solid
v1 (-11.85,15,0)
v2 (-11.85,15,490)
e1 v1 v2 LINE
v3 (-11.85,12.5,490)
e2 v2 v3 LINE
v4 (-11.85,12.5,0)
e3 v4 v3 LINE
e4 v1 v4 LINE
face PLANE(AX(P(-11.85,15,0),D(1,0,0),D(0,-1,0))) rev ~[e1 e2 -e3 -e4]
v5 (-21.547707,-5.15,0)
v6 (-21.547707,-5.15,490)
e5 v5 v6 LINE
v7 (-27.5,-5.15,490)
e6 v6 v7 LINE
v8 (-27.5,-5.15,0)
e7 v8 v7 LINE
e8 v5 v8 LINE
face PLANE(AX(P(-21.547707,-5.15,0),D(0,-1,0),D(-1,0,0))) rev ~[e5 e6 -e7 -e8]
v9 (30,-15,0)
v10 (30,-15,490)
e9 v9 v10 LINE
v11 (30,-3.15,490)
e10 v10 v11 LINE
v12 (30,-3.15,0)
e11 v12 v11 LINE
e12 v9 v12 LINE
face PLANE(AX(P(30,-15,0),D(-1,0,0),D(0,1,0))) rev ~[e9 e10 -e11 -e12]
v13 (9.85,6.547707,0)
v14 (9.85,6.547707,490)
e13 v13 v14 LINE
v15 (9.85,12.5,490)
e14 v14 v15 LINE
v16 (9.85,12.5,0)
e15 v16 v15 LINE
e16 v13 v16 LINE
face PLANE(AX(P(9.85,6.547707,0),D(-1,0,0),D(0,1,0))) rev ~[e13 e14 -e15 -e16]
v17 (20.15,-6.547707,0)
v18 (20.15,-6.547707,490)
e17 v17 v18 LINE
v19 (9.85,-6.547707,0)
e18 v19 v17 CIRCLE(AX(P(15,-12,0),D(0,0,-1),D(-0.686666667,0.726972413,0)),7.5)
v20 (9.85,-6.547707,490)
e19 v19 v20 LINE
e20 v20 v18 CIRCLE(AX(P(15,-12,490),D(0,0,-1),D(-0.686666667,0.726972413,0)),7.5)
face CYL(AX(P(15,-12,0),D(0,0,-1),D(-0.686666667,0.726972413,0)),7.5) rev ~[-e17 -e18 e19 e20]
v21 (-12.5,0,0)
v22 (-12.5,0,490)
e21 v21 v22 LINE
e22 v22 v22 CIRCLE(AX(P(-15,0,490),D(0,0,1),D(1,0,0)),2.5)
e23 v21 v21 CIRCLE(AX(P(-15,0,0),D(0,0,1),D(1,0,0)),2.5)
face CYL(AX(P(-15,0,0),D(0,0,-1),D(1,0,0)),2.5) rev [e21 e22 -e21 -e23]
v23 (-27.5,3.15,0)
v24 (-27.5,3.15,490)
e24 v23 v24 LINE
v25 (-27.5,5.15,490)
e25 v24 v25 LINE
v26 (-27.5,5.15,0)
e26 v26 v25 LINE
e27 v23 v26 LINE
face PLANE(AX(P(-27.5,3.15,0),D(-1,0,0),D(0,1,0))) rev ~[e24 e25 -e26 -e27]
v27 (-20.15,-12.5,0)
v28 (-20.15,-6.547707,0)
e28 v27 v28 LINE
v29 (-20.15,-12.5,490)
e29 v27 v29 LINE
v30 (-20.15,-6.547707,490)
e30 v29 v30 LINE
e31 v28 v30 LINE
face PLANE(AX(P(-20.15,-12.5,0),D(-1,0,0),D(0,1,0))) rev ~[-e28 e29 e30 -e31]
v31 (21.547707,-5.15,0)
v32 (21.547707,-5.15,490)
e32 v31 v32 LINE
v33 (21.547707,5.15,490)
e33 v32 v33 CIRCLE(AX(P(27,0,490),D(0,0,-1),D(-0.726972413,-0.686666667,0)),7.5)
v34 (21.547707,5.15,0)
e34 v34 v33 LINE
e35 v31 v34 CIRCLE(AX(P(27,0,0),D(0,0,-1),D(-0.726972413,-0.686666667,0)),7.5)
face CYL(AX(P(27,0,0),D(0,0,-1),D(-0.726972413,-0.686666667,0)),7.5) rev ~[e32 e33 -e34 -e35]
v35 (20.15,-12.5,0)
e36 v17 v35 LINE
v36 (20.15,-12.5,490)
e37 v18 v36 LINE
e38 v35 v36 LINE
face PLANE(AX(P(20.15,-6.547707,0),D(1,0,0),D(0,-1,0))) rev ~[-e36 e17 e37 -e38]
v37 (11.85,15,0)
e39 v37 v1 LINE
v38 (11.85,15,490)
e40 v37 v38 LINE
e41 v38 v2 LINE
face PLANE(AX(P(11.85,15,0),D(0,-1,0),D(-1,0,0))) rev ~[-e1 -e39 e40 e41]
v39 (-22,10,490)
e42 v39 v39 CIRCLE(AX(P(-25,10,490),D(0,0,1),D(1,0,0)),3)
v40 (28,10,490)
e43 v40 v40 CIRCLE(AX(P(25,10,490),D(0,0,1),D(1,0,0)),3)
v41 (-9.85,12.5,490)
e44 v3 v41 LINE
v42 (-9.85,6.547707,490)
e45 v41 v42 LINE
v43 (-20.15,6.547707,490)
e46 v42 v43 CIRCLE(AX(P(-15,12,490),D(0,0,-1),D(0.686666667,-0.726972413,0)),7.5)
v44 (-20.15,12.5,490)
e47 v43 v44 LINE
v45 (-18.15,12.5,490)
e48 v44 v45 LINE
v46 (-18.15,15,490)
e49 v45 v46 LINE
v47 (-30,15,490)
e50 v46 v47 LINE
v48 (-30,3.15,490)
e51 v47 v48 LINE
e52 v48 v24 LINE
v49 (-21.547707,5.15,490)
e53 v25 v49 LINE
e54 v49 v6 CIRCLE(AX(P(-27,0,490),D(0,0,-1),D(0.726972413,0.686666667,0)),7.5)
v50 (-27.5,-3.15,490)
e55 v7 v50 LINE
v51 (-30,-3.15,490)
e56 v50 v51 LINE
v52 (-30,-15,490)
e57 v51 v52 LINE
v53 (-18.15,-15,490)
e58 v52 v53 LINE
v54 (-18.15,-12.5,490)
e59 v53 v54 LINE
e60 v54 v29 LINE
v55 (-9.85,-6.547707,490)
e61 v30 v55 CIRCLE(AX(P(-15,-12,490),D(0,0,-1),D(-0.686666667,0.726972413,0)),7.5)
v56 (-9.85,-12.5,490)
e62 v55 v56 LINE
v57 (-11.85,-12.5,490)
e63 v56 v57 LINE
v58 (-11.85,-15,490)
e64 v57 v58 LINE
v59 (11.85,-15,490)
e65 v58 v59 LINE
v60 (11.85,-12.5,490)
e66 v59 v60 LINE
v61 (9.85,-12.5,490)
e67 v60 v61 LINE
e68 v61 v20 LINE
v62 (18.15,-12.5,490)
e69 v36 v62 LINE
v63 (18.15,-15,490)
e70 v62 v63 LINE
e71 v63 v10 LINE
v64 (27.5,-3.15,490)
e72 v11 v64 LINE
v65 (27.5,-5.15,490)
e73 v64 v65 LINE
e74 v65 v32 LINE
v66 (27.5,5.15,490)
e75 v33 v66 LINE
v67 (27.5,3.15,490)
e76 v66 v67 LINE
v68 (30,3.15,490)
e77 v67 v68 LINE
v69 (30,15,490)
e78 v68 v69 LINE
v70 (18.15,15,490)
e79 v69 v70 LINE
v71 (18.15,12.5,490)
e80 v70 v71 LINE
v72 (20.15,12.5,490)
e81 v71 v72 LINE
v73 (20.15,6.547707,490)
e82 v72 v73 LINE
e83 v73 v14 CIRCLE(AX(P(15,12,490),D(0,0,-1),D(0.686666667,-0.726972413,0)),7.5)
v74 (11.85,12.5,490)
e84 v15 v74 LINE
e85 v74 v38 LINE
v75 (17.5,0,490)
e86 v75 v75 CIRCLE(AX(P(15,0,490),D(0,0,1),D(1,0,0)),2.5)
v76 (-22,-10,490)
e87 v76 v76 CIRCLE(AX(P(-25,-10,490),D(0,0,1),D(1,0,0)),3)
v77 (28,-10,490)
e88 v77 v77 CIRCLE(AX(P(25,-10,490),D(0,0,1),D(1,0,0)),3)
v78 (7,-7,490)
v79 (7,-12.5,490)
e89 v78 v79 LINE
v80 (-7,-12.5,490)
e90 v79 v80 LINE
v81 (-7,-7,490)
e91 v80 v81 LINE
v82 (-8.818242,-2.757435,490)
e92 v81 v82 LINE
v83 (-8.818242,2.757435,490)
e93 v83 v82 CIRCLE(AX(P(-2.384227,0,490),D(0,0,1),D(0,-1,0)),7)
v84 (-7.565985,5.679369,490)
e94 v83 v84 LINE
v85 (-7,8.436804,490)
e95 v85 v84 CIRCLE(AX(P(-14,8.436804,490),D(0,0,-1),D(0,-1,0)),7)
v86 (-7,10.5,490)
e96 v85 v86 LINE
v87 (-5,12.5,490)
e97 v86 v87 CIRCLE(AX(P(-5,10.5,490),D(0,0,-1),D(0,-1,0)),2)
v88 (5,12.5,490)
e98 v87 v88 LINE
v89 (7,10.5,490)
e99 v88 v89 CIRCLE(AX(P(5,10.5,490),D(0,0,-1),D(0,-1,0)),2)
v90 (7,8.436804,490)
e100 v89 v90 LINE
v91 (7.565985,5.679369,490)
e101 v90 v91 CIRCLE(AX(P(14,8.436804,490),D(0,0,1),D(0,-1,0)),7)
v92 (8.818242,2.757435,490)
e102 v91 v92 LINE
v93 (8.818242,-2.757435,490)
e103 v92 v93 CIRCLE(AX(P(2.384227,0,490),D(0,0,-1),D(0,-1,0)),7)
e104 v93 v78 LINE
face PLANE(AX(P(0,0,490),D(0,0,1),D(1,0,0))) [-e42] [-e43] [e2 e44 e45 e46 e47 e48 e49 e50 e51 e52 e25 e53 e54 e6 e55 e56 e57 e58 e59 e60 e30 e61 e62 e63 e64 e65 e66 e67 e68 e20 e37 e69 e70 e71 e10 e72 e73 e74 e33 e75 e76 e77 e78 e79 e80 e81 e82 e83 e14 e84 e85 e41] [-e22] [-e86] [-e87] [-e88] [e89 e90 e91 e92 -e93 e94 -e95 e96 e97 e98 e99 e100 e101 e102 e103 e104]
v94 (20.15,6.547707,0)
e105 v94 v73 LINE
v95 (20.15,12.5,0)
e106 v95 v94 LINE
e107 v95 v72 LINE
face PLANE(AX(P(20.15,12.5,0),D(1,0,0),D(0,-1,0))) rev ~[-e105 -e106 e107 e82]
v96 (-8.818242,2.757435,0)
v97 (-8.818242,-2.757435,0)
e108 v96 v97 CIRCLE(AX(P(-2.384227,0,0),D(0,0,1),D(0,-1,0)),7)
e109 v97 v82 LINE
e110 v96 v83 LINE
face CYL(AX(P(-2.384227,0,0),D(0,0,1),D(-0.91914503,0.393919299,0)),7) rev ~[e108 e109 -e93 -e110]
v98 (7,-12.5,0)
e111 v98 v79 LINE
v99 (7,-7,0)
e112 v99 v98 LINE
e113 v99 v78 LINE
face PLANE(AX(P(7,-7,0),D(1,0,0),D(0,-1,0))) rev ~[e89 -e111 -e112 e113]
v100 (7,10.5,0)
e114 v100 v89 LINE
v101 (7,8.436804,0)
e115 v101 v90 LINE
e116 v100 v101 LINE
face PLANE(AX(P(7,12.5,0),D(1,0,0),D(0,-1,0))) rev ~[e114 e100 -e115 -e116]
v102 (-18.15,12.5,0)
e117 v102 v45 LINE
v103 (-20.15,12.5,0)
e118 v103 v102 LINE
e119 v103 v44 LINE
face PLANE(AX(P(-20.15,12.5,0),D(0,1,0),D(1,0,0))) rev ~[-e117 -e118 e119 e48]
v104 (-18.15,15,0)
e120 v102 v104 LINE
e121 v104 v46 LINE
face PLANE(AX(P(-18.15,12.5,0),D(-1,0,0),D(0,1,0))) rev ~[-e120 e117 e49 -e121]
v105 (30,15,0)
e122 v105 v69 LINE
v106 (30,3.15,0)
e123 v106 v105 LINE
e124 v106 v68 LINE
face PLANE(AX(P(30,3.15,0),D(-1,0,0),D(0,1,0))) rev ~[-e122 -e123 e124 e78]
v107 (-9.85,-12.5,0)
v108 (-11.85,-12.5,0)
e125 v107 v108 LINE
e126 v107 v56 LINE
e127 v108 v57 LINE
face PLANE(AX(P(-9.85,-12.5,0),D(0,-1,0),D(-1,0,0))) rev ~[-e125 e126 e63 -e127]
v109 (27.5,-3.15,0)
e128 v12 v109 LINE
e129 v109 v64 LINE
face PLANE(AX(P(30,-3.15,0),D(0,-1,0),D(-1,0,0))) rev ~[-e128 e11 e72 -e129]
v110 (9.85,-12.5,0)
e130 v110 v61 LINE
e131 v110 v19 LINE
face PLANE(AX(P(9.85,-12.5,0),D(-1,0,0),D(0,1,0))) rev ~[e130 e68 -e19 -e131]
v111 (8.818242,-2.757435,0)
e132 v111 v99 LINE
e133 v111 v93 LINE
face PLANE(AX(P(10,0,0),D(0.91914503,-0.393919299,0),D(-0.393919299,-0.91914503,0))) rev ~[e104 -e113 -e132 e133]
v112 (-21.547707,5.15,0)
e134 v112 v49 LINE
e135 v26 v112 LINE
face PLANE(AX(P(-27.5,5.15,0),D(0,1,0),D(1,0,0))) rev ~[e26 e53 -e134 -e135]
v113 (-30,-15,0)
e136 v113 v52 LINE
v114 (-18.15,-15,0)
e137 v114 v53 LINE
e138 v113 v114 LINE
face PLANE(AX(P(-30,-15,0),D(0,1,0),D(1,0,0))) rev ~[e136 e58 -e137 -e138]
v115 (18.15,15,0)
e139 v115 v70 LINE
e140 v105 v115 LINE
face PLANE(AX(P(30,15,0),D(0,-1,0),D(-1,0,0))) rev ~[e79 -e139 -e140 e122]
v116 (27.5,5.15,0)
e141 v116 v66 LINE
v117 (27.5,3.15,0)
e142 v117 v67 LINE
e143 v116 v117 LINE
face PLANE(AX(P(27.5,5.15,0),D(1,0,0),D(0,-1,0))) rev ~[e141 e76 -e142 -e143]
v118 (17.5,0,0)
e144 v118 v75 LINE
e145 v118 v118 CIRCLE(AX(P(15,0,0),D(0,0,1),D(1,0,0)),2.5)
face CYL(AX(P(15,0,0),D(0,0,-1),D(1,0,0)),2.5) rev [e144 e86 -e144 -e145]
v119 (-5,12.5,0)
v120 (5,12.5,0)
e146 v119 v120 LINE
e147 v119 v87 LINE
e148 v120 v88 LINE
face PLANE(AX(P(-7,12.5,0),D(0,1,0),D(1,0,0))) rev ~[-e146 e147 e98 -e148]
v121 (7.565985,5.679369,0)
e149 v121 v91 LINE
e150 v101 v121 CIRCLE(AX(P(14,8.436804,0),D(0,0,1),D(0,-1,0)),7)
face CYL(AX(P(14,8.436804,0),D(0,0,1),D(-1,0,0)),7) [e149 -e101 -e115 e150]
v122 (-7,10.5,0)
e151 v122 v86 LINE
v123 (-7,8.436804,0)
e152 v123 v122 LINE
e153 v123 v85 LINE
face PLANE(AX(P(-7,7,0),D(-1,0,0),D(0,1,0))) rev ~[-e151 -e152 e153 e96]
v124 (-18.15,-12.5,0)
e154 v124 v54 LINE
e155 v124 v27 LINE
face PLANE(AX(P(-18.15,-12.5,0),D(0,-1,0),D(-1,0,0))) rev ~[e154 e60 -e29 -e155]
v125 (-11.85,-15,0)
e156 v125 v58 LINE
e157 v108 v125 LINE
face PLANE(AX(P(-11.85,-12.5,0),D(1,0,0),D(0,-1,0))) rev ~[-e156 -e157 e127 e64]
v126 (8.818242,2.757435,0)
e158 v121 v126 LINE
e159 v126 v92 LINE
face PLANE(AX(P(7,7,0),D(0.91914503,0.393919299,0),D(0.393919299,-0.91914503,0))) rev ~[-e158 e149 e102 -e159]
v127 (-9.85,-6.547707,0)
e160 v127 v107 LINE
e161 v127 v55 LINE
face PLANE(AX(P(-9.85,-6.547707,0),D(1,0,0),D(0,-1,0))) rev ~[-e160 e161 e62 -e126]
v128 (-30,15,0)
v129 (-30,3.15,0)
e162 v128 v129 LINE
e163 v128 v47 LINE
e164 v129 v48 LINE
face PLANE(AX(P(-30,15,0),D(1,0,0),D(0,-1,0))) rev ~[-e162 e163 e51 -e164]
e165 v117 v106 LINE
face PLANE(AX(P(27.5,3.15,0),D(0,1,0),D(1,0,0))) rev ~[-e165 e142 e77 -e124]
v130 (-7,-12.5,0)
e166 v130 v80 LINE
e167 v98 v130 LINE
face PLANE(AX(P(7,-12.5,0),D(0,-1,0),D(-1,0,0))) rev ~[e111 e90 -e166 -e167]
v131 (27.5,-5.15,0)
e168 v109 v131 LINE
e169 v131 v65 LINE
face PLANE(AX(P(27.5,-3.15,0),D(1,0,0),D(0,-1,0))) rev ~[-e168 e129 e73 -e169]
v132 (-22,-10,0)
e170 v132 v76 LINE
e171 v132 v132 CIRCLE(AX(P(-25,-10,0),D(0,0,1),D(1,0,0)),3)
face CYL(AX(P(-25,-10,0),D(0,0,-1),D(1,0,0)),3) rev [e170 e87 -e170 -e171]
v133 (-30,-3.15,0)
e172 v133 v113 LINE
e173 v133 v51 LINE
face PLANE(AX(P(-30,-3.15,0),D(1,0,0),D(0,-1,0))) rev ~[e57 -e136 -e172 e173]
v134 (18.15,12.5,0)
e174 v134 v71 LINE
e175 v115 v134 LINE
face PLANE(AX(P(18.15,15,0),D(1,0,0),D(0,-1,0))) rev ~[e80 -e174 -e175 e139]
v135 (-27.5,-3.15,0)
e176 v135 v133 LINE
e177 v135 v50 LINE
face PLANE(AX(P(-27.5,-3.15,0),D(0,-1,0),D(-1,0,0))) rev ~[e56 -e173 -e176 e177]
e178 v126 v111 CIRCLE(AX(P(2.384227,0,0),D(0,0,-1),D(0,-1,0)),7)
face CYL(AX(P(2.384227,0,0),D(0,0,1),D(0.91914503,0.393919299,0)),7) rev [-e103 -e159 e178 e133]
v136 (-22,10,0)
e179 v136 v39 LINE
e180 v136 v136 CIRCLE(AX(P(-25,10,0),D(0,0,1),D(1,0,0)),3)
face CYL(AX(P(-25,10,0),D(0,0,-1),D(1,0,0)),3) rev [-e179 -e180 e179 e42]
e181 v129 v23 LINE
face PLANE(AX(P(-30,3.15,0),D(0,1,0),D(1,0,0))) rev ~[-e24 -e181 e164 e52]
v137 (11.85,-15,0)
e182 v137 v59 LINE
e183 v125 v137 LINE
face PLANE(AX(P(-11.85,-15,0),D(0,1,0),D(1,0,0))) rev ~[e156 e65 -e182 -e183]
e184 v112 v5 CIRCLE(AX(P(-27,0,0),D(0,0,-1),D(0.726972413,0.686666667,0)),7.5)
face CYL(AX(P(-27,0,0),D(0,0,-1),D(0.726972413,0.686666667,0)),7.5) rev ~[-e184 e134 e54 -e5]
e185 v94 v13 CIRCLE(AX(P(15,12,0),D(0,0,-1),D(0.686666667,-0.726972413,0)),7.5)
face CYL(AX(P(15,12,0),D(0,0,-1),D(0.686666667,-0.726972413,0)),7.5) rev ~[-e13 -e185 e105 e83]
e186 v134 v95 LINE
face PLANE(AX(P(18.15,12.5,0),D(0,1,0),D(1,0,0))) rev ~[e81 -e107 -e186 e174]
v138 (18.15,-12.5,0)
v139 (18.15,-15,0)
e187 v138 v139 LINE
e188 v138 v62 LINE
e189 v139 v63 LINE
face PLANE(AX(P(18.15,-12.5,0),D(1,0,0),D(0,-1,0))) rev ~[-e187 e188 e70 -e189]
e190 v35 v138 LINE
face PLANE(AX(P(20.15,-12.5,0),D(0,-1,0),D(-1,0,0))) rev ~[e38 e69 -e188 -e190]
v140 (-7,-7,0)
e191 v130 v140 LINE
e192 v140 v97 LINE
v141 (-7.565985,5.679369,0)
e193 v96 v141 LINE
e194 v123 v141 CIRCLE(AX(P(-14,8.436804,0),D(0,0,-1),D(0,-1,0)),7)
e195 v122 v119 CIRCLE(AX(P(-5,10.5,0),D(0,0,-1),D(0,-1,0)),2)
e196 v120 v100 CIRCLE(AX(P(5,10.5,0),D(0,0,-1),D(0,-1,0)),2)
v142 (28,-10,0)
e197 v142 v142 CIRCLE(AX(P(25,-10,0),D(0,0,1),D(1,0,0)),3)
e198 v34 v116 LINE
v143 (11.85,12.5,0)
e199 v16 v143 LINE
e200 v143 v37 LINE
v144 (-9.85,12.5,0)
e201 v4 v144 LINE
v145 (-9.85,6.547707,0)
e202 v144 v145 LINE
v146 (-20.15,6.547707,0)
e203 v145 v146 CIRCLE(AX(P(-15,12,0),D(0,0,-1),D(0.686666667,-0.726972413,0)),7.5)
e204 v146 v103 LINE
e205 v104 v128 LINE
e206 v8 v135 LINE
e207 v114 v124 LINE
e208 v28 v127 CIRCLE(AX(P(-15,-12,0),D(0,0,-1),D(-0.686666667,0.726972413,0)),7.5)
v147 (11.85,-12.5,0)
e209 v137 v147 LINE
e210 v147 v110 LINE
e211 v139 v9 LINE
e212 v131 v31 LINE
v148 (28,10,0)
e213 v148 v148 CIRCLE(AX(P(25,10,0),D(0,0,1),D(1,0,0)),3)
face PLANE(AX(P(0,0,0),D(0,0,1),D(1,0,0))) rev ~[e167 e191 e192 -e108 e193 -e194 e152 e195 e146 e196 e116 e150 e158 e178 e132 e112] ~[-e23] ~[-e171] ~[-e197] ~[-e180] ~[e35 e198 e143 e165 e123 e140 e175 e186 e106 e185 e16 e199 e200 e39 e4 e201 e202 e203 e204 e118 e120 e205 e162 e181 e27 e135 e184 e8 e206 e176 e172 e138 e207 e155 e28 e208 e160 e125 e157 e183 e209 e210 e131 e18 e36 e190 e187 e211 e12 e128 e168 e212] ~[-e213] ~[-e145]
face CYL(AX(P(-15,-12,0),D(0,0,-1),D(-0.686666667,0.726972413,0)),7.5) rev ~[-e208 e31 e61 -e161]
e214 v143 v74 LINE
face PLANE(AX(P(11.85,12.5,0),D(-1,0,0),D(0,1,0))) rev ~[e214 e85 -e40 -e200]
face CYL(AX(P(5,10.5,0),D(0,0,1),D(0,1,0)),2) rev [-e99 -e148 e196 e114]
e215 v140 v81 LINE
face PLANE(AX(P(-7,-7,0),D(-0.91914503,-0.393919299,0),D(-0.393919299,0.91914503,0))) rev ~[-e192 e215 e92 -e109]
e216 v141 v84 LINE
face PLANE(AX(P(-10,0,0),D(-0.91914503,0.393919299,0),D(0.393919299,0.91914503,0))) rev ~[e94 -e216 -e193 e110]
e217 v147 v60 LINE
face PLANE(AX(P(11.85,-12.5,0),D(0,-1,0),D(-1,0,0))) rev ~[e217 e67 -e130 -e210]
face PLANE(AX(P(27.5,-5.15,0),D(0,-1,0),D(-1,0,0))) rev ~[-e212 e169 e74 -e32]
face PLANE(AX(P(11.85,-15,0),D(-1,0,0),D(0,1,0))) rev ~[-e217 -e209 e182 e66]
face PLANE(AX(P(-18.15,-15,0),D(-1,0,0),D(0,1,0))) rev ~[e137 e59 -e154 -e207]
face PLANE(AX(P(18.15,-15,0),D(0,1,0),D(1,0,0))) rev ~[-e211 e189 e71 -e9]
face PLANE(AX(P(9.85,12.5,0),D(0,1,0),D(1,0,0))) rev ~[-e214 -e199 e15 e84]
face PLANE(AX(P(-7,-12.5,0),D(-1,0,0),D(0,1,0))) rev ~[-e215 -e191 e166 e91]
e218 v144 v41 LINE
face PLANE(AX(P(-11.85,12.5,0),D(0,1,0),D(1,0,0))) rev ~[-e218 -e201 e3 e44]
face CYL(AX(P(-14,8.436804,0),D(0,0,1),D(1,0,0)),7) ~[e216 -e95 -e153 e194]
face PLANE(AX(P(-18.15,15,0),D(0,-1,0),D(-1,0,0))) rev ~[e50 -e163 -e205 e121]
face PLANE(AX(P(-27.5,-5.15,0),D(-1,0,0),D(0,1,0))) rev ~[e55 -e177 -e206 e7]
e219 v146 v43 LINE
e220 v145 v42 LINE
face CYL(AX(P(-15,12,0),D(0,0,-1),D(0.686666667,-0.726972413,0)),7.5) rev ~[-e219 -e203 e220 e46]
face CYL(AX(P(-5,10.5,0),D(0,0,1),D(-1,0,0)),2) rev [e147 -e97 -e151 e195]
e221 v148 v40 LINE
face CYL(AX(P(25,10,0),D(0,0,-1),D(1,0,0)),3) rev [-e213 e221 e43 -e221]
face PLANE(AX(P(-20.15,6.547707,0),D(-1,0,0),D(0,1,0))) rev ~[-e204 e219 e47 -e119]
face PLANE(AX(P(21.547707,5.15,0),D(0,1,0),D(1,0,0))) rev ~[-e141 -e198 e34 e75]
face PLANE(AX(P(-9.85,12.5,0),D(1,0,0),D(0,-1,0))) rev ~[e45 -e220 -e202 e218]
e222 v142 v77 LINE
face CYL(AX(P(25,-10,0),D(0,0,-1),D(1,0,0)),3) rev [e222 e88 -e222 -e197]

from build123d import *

# Parameters (mm, degrees)
F0_R     = 3
F0_R_2   = 2.5
F1_DEPTH = 490
F2_R     = 2
F3_R     = 7


# Not quite as in the source:
# - a feature names something its author has since deleted; it is built from what else it names


with BuildPart() as f1:
    # F0 (on Top) → F1 (new body)
    with BuildSketch(Plane.XY):
        with BuildLine():
            Line((18.15, -15), (30, -15))
            Line((30, -15), (30, -3.15))
            Line((30, -3.15), (27.5, -3.15))
            Line((27.5, -3.15), (27.5, -5.15))
            Line((27.5, -5.15), (21.5477069044, -5.15))
            ThreePointArc((21.5477069044, -5.15), (19.5, 0), (21.5477069044, 5.15))
            Line((21.5477069044, 5.15), (27.5, 5.15))
            Line((27.5, 5.15), (27.5, 3.15))
            Line((27.5, 3.15), (30, 3.15))
            Line((30, 3.15), (30, 15))
            Line((30, 15), (18.15, 15))
            Line((18.15, 15), (18.15, 12.5))
            Line((18.15, 12.5), (20.15, 12.5))
            Line((20.15, 12.5), (20.15, 6.5477069044))
            ThreePointArc((20.15, 6.5477069044), (15, 4.5), (9.85, 6.5477069044))
            Line((9.85, 6.5477069044), (9.85, 12.5))
            Line((9.85, 12.5), (11.85, 12.5))
            Line((11.85, 12.5), (11.85, 15))
            Line((11.85, 15), (-11.85, 15))
            Line((-11.85, 15), (-11.85, 12.5))
            Line((-11.85, 12.5), (-9.85, 12.5))
            Line((-9.85, 12.5), (-9.85, 6.5477069044))
            ThreePointArc((-9.85, 6.5477069044), (-15, 4.5), (-20.15, 6.5477069044))
            Line((-20.15, 6.5477069044), (-20.15, 12.5))
            Line((-20.15, 12.5), (-18.15, 12.5))
            Line((-18.15, 12.5), (-18.15, 15))
            Line((-18.15, 15), (-30, 15))
            Line((-30, 15), (-30, 3.15))
            Line((-30, 3.15), (-27.5, 3.15))
            Line((-27.5, 3.15), (-27.5, 5.15))
            Line((-27.5, 5.15), (-21.5477069044, 5.15))
            ThreePointArc((-21.5477069044, 5.15), (-19.5, 0), (-21.5477069044, -5.15))
            Line((-21.5477069044, -5.15), (-27.5, -5.15))
            Line((-27.5, -5.15), (-27.5, -3.15))
            Line((-27.5, -3.15), (-30, -3.15))
            Line((-30, -3.15), (-30, -15))
            Line((-30, -15), (-18.15, -15))
            Line((-18.15, -15), (-18.15, -12.5))
            Line((-18.15, -12.5), (-20.15, -12.5))
            Line((-20.15, -12.5), (-20.15, -6.5477069044))
            ThreePointArc((-20.15, -6.5477069044), (-15, -4.5), (-9.85, -6.5477069044))
            Line((-9.85, -6.5477069044), (-9.85, -12.5))
            Line((-9.85, -12.5), (-11.85, -12.5))
            Line((-11.85, -12.5), (-11.85, -15))
            Line((-11.85, -15), (11.85, -15))
            Line((11.85, -15), (11.85, -12.5))
            Line((11.85, -12.5), (9.85, -12.5))
            Line((9.85, -12.5), (9.85, -6.5477069044))
            ThreePointArc((9.85, -6.5477069044), (15, -4.5), (20.15, -6.5477069044))
            Line((20.15, -6.5477069044), (20.15, -12.5))
            Line((20.15, -12.5), (18.15, -12.5))
            Line((18.15, -12.5), (18.15, -15))
        make_face()
        with Locations((-25, -10)):
            Circle(F0_R, mode=Mode.SUBTRACT)
        with Locations((25, -10)):
            Circle(F0_R, mode=Mode.SUBTRACT)
        with Locations((-15, 0)):
            Circle(F0_R_2, mode=Mode.SUBTRACT)
        with Locations((-25, 10)):
            Circle(F0_R, mode=Mode.SUBTRACT)
        Polygon((-7, 7), (-7, 12.5), (0, 12.5), (7, 12.5), (7, 7), (10, 0), (7, -7), (7, -12.5), (0, -12.5), (-7, -12.5), (-7, -7), (-10, 0), align=None, mode=Mode.SUBTRACT)
        with Locations((15, 0)):
            Circle(F0_R_2, mode=Mode.SUBTRACT)
        with Locations((25, 10)):
            Circle(F0_R, mode=Mode.SUBTRACT)
    extrude(amount=F1_DEPTH)

    # F2
    f2_edges = [f1.edges().sort_by_distance(p)[0] for p in [
        (-7, 12.5, 245),
        (7, 12.5, 245),
    ]]
    fillet(f2_edges, radius=F2_R)

    # F3
    f3_edges = [f1.edges().sort_by_distance(p)[0] for p in [
        (-7, 7, 245),
        (-10, 0, 245),
        (7, 7, 245),
        (10, 0, 245),
    ]]
    fillet(f3_edges, radius=F3_R)


solid = f1.part
